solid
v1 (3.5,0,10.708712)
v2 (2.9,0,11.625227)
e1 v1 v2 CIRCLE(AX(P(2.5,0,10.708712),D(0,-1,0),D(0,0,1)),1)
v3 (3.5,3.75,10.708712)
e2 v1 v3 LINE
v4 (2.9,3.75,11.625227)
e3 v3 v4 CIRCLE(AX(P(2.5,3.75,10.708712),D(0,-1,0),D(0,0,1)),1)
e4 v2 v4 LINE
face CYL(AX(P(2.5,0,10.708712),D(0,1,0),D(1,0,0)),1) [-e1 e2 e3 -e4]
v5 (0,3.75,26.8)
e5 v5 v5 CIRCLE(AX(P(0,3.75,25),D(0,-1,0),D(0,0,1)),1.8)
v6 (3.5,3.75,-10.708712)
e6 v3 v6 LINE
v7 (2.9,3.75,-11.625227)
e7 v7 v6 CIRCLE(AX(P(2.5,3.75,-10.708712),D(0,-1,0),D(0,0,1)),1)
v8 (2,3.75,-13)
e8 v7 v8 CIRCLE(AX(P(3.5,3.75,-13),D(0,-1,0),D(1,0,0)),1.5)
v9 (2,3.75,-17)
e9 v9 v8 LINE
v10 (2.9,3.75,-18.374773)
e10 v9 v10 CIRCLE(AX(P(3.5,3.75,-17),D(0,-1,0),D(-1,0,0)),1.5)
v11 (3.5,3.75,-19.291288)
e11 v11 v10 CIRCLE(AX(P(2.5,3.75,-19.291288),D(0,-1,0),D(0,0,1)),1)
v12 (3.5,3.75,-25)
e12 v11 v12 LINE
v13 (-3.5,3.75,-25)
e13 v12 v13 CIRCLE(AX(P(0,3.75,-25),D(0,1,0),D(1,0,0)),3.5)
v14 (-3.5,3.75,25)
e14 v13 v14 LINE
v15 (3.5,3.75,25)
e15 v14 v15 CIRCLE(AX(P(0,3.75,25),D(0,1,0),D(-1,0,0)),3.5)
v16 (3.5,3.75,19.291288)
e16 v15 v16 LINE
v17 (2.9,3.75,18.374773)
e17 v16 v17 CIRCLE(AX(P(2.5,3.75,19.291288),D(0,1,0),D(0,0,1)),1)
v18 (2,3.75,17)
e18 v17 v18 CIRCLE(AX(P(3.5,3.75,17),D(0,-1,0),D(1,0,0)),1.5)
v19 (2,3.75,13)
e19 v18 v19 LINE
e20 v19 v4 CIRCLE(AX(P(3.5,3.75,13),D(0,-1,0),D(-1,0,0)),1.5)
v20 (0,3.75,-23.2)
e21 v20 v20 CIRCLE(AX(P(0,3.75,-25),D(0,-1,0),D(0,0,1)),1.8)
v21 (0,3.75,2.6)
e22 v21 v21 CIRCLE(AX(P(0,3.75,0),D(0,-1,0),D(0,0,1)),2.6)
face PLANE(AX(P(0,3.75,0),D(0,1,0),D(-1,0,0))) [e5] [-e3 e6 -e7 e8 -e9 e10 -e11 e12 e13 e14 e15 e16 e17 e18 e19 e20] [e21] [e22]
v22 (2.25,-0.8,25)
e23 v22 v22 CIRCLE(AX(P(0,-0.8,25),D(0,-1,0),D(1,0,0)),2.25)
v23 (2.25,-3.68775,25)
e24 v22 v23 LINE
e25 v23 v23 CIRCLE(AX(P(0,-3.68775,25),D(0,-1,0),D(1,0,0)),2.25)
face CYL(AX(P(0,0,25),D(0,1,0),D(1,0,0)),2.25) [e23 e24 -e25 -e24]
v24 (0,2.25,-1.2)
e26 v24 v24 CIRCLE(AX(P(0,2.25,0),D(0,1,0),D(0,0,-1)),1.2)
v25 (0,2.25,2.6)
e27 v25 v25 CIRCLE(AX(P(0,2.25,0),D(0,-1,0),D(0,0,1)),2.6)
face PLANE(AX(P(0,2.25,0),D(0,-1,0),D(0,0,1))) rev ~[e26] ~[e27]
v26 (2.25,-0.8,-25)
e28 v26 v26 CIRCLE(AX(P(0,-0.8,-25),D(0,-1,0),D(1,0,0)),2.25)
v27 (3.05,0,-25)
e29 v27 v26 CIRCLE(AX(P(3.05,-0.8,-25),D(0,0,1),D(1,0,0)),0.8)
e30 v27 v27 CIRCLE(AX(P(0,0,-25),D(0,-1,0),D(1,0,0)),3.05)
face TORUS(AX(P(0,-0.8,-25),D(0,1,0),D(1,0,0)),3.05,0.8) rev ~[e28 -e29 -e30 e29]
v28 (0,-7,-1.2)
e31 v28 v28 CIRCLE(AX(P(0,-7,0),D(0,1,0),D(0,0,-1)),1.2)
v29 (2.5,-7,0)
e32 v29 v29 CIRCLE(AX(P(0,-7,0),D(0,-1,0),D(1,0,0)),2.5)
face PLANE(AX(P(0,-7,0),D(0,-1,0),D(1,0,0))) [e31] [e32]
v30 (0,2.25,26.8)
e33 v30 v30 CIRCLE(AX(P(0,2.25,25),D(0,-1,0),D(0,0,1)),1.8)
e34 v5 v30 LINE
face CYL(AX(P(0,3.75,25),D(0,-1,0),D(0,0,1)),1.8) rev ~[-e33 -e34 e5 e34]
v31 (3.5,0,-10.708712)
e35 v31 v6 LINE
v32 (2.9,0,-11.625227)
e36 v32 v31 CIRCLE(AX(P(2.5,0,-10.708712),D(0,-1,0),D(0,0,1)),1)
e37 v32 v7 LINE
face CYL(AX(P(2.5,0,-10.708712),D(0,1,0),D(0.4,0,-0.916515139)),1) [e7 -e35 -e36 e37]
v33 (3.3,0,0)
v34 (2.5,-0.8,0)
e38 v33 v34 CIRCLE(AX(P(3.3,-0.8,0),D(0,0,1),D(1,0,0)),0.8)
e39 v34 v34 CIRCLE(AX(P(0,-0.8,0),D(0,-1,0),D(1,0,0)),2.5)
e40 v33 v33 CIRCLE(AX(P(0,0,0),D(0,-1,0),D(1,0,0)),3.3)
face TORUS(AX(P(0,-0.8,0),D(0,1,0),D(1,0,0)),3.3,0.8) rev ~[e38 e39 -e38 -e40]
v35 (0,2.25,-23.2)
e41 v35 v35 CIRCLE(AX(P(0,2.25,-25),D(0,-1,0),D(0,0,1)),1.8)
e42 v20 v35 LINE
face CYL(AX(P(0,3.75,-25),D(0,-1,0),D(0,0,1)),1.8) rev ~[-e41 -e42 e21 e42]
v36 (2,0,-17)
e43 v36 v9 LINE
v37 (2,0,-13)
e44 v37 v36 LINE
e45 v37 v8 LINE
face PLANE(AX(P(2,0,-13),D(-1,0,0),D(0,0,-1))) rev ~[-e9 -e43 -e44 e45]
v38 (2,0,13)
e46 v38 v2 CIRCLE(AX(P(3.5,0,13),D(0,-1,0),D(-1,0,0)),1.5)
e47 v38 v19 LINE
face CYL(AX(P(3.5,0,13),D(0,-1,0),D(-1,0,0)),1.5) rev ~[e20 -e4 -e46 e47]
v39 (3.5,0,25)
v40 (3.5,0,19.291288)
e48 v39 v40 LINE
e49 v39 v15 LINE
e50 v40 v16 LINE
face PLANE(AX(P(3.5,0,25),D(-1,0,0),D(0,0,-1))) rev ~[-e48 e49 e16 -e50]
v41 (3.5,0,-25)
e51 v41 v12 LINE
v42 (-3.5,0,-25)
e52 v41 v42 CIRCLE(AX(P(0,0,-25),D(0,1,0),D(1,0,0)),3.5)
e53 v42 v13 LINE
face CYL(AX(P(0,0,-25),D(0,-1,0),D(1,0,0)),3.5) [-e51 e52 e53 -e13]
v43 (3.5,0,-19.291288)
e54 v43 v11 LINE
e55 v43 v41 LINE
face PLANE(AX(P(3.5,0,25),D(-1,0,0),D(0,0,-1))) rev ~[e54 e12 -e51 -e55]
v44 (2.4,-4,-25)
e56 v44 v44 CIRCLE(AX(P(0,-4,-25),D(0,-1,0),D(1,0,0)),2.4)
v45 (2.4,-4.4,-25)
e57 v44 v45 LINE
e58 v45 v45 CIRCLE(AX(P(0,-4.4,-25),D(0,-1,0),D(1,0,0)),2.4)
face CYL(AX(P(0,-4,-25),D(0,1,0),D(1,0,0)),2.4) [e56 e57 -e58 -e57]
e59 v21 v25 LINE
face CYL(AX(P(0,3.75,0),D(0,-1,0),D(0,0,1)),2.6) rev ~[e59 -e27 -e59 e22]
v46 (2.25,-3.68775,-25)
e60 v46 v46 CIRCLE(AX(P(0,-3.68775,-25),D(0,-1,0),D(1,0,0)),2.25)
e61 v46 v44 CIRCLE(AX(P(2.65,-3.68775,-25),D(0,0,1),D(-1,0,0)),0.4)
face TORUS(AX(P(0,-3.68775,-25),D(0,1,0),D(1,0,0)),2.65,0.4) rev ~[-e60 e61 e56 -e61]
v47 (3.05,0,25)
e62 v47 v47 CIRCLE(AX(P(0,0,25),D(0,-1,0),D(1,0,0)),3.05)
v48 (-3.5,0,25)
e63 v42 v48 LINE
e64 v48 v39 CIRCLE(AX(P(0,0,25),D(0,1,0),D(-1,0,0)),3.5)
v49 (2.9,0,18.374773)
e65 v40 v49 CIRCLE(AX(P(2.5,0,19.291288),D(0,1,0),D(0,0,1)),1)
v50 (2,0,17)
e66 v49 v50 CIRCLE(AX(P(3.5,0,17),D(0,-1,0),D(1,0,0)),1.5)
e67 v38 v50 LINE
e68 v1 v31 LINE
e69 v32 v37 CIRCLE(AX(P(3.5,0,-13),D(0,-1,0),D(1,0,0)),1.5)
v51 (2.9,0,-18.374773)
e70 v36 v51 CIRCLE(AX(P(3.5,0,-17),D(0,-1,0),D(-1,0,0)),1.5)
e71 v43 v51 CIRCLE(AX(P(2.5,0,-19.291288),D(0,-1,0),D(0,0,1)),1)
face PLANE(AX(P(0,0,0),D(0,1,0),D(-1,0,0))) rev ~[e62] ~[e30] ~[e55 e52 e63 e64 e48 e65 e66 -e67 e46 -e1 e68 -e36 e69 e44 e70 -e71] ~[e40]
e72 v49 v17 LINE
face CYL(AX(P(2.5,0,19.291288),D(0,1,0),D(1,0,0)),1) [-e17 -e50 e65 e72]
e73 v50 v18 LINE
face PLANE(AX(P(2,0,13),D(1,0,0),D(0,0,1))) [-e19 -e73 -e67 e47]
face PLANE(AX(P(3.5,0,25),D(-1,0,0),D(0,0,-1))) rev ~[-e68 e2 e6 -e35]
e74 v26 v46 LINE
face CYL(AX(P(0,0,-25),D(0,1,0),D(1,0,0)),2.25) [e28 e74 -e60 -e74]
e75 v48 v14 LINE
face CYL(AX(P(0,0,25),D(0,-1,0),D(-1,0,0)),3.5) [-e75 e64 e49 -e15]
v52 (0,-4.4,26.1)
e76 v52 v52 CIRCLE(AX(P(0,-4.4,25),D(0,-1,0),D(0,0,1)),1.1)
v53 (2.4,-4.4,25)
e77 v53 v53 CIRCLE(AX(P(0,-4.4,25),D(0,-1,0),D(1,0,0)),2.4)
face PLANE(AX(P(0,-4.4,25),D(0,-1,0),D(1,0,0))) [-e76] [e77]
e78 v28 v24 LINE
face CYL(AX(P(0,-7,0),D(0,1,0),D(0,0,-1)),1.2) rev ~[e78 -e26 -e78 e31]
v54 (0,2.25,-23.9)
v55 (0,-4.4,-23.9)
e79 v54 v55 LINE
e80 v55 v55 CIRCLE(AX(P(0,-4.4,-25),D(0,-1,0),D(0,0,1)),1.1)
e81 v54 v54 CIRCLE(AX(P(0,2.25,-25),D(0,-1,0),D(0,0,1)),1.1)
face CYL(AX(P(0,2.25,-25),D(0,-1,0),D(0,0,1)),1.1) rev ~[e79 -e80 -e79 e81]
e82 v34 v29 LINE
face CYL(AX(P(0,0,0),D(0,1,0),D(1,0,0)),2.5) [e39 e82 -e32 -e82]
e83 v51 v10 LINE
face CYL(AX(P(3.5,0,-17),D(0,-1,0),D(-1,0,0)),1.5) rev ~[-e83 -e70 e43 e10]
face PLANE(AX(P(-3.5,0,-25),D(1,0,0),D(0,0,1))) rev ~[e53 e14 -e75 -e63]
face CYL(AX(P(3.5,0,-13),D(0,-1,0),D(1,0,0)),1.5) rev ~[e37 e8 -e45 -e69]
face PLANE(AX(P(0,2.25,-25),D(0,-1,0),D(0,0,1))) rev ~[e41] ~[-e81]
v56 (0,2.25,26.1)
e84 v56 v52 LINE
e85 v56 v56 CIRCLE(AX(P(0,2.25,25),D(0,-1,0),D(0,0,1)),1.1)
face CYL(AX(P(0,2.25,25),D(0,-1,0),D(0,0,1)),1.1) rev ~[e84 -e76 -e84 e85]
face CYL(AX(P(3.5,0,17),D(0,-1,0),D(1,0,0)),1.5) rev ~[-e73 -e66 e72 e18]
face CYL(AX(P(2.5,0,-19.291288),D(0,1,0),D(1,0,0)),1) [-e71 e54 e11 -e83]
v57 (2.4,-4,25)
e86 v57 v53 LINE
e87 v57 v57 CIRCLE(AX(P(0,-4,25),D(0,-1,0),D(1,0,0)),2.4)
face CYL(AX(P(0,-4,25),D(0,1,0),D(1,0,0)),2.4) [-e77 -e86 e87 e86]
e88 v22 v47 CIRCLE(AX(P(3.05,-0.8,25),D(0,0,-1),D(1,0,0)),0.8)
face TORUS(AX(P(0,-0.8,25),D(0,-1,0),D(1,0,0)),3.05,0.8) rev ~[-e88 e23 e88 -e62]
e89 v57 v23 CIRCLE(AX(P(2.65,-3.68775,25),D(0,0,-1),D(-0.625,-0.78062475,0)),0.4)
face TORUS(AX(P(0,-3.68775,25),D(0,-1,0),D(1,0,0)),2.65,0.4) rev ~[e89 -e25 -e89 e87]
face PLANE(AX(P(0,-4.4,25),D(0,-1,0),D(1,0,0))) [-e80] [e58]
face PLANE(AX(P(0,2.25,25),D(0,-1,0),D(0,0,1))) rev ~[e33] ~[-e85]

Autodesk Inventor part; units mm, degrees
ref_plane "YZ Plane" through (0, 0, 0) normal (1, 0, 0) x (0, 1, 0)
ref_plane "XZ Plane" through (0, 0, 0) normal (0, 1, 0) x (-1, 0, 0)
ref_plane "XY Plane" through (0, 0, 0) normal (0, 0, 1) x (1, 0, 0)
sketch "Sketch1" plane through (0, 0, 0) normal (0, 1, 0) x (-1, 0, 0)
  line L0 (0, 25) -> (0, -25) construction
  line L1 (-3.5, 25) -> (-3.5, -25)
  line L2 (3.5, -25) -> (3.5, 25)
  arc A0 (3.5, 25) -> (-3.5, 25) centre (0, 25) ccw
  arc A1 (-3.5, -25) -> (3.5, -25) centre (0, -25) ccw
  point P0 (0, 0)
  point P1 (0, 0)
  dimension "d0" = 50
  dimension "d1" = 7
extrude "Extrusion1" add sketch "Sketch1" along normal blind 3.75
sketch "Sketch2" plane through (0, 3.75, 0) normal (0, 1, 0) x (1, 0, 0)
  arc A0 (3.5, 25) -> (-3.5, 25) centre (0, 25) ccw projected
  line L0 (-3.5, 25) -> (-3.5, -25) projected
  arc A1 (-3.5, -25) -> (3.5, -25) centre (0, -25) ccw projected
  line L1 (3.5, -25) -> (3.5, 25) projected
  circle A2 centre (0, 25) radius 1.5
  circle A3 centre (0, -25) radius 1.5
  arc A4 (-3.5, -25) -> (3.5, -25) centre (0, -25) ccw projected
  point P0 (0, 0)
  dimension "d38" = 3
  dimension "d39" = 3
sketch "Sketch3" plane through (0, 0, 0) normal (0, -1, 0) x (1, 0, 0)
  arc A0 (-3.5, -25) -> (3.5, -25) centre (0, -25) ccw projected
  line L0 (3.5, 25) -> (3.5, -25) projected
  arc A1 (3.5, 25) -> (-3.5, 25) centre (0, 25) ccw projected
  line L1 (-3.5, -25) -> (-3.5, 25) projected
  circle A2 centre (0, 0) radius 2.5
  circle A3 centre (0, 0) radius 1.2
  dimension "d11" = 5
  dimension "d14" = 2.4
extrude "Extrusion2" add sketch "Sketch3" along normal blind 7 contours A2 | A3
sketch "Sketch5" plane through (0, -7, 0) normal (0, -1, 0) x (1, 0, 0)
  point P0 (0, 0)
  point P1 (0, 0)
hole "Hole2" at (0, -7, 0) direction (0, 1, 0) diameter 2.4 depth 10 tip angle 118
sketch "Sketch6" plane through (0, 3.75, 0) normal (0, 1, 0) x (1, 0, 0)
  point P0 (0, 0)
  point P1 (0, 0)
hole "Hole3" at (0, 3.75, 0) direction (0, -1, 0) diameter 5.2 depth 1.5
sketch "Sketch8" plane through (0, 0, 0) normal (0, -1, 0) x (1, 0, 0)
  circle A0 centre (0, 0) radius 2.5 projected
  arc A1 (-3.5, -25) -> (3.5, -25) centre (0, -25) ccw projected
  line L0 (3.5, 25) -> (3.5, -25) projected
  arc A2 (3.5, 25) -> (-3.5, 25) centre (0, 25) ccw projected
  line L1 (-3.5, -25) -> (-3.5, 25) projected
  line L2 (3.5, 25) -> (3.5, -25) projected
  line L3 (3.5, -13) -> (3.5, -17) construction
  line L4 (2, -13) -> (2, -17)
  line L5 (5, -17) -> (5, -13)
  arc A3 (5, -13) -> (2, -13) centre (3.5, -13) ccw
  arc A4 (2, -17) -> (5, -17) centre (3.5, -17) ccw
  line L6 (-5.2, 0) -> (6.7, 0) projected
  line L7 (3.5, 13) -> (3.5, 17) construction
  line L8 (2, 13) -> (2, 17)
  line L9 (5, 17) -> (5, 13)
  arc A5 (2, 13) -> (5, 13) centre (3.5, 13) ccw
  arc A6 (5, 17) -> (2, 17) centre (3.5, 17) ccw
  point P0 (3.5, -15)
  point P1 (3.5, -18.5)
  point P2 (3.5, -11.5)
  point P3 (3.5, 15)
  point P4 (3.5, 11.5)
  point P5 (3.5, 18.5)
  dimension "d32" = 4
  dimension "d33" = 3
  dimension "d34" = 15
extrude "Extrusion4" cut sketch "Sketch8" against normal through all contours A5 L8 A6 L0 | L0 A4 L4 A3
fillet "Fillet1" radius 1 4 edges at (3.5, 1.875, -11.5) (3.5, 1.875, -18.5) (3.5, 1.875, 18.5) (3.5, 1.875, 11.5)
extrude "Extrusion5" [suppressed]
sketch "Sketch9" plane through (0, 9.55, -25) normal (0, 1, 0) x (1, 0, 0)
  circle A0 centre (0, 0) radius 1.5 projected
  circle A1 centre (0, -50) radius 1.5 projected
  circle A2 centre (0, -50) radius 1.5 projected
  circle A3 centre (0, -50) radius 1.85
  circle A4 centre (0, 0) radius 1.5 projected
  circle A5 centre (0, 0) radius 1.85
  point P0 (0, -25)
  dimension "d42" = 3.7
  dimension "d43" = 3.7
extrude "Extrusion6" [suppressed]
chamfer "Chamfer1" [suppressed]
fillet "Fillet2" [suppressed]
sketch "Sketch10" plane through (0, 0, 0) normal (0, -1, 0) x (1, 0, 0)
  arc A0 (3.5, 25) -> (-3.5, 25) centre (0, 25) ccw projected
  arc A1 (-3.5, -25) -> (3.5, -25) centre (0, -25) ccw projected
  circle A2 centre (0, 25) radius 2.25
  circle A3 centre (0, -25) radius 2.25
  point P0 (0, 0)
  dimension "d50" = 4.5
extrude "Extrusion7" add sketch "Sketch10" along normal blind 4
sketch "Sketch11" plane through (0, -4, 25) normal (0, -1, 0) x (1, 0, 0)
  circle A0 centre (0, 0) radius 2.25 projected
  circle A1 centre (0, -50) radius 2.25 projected
  circle A2 centre (0, 0) radius 2.4
  circle A3 centre (0, -50) radius 2.4
  point P0 (0, -25)
  dimension "d54" = 4.8
  dimension "d70" = 4.5
extrude "Extrusion8" add sketch "Sketch11" along normal blind 0.4 contours A0 | A1 | A2 | A3
fillet "Fillet3" radius 0.4 2 edges at (-2.25, -4, 25) (-2.25, -4, -25)
fillet "Fillet4" radius 0.8 3 edges at (-2.25, 0, 25) (-2.25, 0, -25) (-2.5, 0, 0)
sketch "Sketch13" plane through (0, 3.75, 0) normal (0, 1, 0) x (1, 0, 0)
  circle A0 centre (0, -25) radius 2.4 projected
  circle A1 centre (0, 25) radius 2.25 projected
  circle A2 centre (0, -25) radius 3.05 projected
  point P0 (0, 0)
hole "Hole4" at (0, 3.75, 25) at (0, 3.75, -25) direction (0, -1, 0) diameter 2.2 end through all counterbore diameter 3.6 counterbore depth 1.5
equation "\"d43\" = d42"
properties part number "ActuatorLink"
